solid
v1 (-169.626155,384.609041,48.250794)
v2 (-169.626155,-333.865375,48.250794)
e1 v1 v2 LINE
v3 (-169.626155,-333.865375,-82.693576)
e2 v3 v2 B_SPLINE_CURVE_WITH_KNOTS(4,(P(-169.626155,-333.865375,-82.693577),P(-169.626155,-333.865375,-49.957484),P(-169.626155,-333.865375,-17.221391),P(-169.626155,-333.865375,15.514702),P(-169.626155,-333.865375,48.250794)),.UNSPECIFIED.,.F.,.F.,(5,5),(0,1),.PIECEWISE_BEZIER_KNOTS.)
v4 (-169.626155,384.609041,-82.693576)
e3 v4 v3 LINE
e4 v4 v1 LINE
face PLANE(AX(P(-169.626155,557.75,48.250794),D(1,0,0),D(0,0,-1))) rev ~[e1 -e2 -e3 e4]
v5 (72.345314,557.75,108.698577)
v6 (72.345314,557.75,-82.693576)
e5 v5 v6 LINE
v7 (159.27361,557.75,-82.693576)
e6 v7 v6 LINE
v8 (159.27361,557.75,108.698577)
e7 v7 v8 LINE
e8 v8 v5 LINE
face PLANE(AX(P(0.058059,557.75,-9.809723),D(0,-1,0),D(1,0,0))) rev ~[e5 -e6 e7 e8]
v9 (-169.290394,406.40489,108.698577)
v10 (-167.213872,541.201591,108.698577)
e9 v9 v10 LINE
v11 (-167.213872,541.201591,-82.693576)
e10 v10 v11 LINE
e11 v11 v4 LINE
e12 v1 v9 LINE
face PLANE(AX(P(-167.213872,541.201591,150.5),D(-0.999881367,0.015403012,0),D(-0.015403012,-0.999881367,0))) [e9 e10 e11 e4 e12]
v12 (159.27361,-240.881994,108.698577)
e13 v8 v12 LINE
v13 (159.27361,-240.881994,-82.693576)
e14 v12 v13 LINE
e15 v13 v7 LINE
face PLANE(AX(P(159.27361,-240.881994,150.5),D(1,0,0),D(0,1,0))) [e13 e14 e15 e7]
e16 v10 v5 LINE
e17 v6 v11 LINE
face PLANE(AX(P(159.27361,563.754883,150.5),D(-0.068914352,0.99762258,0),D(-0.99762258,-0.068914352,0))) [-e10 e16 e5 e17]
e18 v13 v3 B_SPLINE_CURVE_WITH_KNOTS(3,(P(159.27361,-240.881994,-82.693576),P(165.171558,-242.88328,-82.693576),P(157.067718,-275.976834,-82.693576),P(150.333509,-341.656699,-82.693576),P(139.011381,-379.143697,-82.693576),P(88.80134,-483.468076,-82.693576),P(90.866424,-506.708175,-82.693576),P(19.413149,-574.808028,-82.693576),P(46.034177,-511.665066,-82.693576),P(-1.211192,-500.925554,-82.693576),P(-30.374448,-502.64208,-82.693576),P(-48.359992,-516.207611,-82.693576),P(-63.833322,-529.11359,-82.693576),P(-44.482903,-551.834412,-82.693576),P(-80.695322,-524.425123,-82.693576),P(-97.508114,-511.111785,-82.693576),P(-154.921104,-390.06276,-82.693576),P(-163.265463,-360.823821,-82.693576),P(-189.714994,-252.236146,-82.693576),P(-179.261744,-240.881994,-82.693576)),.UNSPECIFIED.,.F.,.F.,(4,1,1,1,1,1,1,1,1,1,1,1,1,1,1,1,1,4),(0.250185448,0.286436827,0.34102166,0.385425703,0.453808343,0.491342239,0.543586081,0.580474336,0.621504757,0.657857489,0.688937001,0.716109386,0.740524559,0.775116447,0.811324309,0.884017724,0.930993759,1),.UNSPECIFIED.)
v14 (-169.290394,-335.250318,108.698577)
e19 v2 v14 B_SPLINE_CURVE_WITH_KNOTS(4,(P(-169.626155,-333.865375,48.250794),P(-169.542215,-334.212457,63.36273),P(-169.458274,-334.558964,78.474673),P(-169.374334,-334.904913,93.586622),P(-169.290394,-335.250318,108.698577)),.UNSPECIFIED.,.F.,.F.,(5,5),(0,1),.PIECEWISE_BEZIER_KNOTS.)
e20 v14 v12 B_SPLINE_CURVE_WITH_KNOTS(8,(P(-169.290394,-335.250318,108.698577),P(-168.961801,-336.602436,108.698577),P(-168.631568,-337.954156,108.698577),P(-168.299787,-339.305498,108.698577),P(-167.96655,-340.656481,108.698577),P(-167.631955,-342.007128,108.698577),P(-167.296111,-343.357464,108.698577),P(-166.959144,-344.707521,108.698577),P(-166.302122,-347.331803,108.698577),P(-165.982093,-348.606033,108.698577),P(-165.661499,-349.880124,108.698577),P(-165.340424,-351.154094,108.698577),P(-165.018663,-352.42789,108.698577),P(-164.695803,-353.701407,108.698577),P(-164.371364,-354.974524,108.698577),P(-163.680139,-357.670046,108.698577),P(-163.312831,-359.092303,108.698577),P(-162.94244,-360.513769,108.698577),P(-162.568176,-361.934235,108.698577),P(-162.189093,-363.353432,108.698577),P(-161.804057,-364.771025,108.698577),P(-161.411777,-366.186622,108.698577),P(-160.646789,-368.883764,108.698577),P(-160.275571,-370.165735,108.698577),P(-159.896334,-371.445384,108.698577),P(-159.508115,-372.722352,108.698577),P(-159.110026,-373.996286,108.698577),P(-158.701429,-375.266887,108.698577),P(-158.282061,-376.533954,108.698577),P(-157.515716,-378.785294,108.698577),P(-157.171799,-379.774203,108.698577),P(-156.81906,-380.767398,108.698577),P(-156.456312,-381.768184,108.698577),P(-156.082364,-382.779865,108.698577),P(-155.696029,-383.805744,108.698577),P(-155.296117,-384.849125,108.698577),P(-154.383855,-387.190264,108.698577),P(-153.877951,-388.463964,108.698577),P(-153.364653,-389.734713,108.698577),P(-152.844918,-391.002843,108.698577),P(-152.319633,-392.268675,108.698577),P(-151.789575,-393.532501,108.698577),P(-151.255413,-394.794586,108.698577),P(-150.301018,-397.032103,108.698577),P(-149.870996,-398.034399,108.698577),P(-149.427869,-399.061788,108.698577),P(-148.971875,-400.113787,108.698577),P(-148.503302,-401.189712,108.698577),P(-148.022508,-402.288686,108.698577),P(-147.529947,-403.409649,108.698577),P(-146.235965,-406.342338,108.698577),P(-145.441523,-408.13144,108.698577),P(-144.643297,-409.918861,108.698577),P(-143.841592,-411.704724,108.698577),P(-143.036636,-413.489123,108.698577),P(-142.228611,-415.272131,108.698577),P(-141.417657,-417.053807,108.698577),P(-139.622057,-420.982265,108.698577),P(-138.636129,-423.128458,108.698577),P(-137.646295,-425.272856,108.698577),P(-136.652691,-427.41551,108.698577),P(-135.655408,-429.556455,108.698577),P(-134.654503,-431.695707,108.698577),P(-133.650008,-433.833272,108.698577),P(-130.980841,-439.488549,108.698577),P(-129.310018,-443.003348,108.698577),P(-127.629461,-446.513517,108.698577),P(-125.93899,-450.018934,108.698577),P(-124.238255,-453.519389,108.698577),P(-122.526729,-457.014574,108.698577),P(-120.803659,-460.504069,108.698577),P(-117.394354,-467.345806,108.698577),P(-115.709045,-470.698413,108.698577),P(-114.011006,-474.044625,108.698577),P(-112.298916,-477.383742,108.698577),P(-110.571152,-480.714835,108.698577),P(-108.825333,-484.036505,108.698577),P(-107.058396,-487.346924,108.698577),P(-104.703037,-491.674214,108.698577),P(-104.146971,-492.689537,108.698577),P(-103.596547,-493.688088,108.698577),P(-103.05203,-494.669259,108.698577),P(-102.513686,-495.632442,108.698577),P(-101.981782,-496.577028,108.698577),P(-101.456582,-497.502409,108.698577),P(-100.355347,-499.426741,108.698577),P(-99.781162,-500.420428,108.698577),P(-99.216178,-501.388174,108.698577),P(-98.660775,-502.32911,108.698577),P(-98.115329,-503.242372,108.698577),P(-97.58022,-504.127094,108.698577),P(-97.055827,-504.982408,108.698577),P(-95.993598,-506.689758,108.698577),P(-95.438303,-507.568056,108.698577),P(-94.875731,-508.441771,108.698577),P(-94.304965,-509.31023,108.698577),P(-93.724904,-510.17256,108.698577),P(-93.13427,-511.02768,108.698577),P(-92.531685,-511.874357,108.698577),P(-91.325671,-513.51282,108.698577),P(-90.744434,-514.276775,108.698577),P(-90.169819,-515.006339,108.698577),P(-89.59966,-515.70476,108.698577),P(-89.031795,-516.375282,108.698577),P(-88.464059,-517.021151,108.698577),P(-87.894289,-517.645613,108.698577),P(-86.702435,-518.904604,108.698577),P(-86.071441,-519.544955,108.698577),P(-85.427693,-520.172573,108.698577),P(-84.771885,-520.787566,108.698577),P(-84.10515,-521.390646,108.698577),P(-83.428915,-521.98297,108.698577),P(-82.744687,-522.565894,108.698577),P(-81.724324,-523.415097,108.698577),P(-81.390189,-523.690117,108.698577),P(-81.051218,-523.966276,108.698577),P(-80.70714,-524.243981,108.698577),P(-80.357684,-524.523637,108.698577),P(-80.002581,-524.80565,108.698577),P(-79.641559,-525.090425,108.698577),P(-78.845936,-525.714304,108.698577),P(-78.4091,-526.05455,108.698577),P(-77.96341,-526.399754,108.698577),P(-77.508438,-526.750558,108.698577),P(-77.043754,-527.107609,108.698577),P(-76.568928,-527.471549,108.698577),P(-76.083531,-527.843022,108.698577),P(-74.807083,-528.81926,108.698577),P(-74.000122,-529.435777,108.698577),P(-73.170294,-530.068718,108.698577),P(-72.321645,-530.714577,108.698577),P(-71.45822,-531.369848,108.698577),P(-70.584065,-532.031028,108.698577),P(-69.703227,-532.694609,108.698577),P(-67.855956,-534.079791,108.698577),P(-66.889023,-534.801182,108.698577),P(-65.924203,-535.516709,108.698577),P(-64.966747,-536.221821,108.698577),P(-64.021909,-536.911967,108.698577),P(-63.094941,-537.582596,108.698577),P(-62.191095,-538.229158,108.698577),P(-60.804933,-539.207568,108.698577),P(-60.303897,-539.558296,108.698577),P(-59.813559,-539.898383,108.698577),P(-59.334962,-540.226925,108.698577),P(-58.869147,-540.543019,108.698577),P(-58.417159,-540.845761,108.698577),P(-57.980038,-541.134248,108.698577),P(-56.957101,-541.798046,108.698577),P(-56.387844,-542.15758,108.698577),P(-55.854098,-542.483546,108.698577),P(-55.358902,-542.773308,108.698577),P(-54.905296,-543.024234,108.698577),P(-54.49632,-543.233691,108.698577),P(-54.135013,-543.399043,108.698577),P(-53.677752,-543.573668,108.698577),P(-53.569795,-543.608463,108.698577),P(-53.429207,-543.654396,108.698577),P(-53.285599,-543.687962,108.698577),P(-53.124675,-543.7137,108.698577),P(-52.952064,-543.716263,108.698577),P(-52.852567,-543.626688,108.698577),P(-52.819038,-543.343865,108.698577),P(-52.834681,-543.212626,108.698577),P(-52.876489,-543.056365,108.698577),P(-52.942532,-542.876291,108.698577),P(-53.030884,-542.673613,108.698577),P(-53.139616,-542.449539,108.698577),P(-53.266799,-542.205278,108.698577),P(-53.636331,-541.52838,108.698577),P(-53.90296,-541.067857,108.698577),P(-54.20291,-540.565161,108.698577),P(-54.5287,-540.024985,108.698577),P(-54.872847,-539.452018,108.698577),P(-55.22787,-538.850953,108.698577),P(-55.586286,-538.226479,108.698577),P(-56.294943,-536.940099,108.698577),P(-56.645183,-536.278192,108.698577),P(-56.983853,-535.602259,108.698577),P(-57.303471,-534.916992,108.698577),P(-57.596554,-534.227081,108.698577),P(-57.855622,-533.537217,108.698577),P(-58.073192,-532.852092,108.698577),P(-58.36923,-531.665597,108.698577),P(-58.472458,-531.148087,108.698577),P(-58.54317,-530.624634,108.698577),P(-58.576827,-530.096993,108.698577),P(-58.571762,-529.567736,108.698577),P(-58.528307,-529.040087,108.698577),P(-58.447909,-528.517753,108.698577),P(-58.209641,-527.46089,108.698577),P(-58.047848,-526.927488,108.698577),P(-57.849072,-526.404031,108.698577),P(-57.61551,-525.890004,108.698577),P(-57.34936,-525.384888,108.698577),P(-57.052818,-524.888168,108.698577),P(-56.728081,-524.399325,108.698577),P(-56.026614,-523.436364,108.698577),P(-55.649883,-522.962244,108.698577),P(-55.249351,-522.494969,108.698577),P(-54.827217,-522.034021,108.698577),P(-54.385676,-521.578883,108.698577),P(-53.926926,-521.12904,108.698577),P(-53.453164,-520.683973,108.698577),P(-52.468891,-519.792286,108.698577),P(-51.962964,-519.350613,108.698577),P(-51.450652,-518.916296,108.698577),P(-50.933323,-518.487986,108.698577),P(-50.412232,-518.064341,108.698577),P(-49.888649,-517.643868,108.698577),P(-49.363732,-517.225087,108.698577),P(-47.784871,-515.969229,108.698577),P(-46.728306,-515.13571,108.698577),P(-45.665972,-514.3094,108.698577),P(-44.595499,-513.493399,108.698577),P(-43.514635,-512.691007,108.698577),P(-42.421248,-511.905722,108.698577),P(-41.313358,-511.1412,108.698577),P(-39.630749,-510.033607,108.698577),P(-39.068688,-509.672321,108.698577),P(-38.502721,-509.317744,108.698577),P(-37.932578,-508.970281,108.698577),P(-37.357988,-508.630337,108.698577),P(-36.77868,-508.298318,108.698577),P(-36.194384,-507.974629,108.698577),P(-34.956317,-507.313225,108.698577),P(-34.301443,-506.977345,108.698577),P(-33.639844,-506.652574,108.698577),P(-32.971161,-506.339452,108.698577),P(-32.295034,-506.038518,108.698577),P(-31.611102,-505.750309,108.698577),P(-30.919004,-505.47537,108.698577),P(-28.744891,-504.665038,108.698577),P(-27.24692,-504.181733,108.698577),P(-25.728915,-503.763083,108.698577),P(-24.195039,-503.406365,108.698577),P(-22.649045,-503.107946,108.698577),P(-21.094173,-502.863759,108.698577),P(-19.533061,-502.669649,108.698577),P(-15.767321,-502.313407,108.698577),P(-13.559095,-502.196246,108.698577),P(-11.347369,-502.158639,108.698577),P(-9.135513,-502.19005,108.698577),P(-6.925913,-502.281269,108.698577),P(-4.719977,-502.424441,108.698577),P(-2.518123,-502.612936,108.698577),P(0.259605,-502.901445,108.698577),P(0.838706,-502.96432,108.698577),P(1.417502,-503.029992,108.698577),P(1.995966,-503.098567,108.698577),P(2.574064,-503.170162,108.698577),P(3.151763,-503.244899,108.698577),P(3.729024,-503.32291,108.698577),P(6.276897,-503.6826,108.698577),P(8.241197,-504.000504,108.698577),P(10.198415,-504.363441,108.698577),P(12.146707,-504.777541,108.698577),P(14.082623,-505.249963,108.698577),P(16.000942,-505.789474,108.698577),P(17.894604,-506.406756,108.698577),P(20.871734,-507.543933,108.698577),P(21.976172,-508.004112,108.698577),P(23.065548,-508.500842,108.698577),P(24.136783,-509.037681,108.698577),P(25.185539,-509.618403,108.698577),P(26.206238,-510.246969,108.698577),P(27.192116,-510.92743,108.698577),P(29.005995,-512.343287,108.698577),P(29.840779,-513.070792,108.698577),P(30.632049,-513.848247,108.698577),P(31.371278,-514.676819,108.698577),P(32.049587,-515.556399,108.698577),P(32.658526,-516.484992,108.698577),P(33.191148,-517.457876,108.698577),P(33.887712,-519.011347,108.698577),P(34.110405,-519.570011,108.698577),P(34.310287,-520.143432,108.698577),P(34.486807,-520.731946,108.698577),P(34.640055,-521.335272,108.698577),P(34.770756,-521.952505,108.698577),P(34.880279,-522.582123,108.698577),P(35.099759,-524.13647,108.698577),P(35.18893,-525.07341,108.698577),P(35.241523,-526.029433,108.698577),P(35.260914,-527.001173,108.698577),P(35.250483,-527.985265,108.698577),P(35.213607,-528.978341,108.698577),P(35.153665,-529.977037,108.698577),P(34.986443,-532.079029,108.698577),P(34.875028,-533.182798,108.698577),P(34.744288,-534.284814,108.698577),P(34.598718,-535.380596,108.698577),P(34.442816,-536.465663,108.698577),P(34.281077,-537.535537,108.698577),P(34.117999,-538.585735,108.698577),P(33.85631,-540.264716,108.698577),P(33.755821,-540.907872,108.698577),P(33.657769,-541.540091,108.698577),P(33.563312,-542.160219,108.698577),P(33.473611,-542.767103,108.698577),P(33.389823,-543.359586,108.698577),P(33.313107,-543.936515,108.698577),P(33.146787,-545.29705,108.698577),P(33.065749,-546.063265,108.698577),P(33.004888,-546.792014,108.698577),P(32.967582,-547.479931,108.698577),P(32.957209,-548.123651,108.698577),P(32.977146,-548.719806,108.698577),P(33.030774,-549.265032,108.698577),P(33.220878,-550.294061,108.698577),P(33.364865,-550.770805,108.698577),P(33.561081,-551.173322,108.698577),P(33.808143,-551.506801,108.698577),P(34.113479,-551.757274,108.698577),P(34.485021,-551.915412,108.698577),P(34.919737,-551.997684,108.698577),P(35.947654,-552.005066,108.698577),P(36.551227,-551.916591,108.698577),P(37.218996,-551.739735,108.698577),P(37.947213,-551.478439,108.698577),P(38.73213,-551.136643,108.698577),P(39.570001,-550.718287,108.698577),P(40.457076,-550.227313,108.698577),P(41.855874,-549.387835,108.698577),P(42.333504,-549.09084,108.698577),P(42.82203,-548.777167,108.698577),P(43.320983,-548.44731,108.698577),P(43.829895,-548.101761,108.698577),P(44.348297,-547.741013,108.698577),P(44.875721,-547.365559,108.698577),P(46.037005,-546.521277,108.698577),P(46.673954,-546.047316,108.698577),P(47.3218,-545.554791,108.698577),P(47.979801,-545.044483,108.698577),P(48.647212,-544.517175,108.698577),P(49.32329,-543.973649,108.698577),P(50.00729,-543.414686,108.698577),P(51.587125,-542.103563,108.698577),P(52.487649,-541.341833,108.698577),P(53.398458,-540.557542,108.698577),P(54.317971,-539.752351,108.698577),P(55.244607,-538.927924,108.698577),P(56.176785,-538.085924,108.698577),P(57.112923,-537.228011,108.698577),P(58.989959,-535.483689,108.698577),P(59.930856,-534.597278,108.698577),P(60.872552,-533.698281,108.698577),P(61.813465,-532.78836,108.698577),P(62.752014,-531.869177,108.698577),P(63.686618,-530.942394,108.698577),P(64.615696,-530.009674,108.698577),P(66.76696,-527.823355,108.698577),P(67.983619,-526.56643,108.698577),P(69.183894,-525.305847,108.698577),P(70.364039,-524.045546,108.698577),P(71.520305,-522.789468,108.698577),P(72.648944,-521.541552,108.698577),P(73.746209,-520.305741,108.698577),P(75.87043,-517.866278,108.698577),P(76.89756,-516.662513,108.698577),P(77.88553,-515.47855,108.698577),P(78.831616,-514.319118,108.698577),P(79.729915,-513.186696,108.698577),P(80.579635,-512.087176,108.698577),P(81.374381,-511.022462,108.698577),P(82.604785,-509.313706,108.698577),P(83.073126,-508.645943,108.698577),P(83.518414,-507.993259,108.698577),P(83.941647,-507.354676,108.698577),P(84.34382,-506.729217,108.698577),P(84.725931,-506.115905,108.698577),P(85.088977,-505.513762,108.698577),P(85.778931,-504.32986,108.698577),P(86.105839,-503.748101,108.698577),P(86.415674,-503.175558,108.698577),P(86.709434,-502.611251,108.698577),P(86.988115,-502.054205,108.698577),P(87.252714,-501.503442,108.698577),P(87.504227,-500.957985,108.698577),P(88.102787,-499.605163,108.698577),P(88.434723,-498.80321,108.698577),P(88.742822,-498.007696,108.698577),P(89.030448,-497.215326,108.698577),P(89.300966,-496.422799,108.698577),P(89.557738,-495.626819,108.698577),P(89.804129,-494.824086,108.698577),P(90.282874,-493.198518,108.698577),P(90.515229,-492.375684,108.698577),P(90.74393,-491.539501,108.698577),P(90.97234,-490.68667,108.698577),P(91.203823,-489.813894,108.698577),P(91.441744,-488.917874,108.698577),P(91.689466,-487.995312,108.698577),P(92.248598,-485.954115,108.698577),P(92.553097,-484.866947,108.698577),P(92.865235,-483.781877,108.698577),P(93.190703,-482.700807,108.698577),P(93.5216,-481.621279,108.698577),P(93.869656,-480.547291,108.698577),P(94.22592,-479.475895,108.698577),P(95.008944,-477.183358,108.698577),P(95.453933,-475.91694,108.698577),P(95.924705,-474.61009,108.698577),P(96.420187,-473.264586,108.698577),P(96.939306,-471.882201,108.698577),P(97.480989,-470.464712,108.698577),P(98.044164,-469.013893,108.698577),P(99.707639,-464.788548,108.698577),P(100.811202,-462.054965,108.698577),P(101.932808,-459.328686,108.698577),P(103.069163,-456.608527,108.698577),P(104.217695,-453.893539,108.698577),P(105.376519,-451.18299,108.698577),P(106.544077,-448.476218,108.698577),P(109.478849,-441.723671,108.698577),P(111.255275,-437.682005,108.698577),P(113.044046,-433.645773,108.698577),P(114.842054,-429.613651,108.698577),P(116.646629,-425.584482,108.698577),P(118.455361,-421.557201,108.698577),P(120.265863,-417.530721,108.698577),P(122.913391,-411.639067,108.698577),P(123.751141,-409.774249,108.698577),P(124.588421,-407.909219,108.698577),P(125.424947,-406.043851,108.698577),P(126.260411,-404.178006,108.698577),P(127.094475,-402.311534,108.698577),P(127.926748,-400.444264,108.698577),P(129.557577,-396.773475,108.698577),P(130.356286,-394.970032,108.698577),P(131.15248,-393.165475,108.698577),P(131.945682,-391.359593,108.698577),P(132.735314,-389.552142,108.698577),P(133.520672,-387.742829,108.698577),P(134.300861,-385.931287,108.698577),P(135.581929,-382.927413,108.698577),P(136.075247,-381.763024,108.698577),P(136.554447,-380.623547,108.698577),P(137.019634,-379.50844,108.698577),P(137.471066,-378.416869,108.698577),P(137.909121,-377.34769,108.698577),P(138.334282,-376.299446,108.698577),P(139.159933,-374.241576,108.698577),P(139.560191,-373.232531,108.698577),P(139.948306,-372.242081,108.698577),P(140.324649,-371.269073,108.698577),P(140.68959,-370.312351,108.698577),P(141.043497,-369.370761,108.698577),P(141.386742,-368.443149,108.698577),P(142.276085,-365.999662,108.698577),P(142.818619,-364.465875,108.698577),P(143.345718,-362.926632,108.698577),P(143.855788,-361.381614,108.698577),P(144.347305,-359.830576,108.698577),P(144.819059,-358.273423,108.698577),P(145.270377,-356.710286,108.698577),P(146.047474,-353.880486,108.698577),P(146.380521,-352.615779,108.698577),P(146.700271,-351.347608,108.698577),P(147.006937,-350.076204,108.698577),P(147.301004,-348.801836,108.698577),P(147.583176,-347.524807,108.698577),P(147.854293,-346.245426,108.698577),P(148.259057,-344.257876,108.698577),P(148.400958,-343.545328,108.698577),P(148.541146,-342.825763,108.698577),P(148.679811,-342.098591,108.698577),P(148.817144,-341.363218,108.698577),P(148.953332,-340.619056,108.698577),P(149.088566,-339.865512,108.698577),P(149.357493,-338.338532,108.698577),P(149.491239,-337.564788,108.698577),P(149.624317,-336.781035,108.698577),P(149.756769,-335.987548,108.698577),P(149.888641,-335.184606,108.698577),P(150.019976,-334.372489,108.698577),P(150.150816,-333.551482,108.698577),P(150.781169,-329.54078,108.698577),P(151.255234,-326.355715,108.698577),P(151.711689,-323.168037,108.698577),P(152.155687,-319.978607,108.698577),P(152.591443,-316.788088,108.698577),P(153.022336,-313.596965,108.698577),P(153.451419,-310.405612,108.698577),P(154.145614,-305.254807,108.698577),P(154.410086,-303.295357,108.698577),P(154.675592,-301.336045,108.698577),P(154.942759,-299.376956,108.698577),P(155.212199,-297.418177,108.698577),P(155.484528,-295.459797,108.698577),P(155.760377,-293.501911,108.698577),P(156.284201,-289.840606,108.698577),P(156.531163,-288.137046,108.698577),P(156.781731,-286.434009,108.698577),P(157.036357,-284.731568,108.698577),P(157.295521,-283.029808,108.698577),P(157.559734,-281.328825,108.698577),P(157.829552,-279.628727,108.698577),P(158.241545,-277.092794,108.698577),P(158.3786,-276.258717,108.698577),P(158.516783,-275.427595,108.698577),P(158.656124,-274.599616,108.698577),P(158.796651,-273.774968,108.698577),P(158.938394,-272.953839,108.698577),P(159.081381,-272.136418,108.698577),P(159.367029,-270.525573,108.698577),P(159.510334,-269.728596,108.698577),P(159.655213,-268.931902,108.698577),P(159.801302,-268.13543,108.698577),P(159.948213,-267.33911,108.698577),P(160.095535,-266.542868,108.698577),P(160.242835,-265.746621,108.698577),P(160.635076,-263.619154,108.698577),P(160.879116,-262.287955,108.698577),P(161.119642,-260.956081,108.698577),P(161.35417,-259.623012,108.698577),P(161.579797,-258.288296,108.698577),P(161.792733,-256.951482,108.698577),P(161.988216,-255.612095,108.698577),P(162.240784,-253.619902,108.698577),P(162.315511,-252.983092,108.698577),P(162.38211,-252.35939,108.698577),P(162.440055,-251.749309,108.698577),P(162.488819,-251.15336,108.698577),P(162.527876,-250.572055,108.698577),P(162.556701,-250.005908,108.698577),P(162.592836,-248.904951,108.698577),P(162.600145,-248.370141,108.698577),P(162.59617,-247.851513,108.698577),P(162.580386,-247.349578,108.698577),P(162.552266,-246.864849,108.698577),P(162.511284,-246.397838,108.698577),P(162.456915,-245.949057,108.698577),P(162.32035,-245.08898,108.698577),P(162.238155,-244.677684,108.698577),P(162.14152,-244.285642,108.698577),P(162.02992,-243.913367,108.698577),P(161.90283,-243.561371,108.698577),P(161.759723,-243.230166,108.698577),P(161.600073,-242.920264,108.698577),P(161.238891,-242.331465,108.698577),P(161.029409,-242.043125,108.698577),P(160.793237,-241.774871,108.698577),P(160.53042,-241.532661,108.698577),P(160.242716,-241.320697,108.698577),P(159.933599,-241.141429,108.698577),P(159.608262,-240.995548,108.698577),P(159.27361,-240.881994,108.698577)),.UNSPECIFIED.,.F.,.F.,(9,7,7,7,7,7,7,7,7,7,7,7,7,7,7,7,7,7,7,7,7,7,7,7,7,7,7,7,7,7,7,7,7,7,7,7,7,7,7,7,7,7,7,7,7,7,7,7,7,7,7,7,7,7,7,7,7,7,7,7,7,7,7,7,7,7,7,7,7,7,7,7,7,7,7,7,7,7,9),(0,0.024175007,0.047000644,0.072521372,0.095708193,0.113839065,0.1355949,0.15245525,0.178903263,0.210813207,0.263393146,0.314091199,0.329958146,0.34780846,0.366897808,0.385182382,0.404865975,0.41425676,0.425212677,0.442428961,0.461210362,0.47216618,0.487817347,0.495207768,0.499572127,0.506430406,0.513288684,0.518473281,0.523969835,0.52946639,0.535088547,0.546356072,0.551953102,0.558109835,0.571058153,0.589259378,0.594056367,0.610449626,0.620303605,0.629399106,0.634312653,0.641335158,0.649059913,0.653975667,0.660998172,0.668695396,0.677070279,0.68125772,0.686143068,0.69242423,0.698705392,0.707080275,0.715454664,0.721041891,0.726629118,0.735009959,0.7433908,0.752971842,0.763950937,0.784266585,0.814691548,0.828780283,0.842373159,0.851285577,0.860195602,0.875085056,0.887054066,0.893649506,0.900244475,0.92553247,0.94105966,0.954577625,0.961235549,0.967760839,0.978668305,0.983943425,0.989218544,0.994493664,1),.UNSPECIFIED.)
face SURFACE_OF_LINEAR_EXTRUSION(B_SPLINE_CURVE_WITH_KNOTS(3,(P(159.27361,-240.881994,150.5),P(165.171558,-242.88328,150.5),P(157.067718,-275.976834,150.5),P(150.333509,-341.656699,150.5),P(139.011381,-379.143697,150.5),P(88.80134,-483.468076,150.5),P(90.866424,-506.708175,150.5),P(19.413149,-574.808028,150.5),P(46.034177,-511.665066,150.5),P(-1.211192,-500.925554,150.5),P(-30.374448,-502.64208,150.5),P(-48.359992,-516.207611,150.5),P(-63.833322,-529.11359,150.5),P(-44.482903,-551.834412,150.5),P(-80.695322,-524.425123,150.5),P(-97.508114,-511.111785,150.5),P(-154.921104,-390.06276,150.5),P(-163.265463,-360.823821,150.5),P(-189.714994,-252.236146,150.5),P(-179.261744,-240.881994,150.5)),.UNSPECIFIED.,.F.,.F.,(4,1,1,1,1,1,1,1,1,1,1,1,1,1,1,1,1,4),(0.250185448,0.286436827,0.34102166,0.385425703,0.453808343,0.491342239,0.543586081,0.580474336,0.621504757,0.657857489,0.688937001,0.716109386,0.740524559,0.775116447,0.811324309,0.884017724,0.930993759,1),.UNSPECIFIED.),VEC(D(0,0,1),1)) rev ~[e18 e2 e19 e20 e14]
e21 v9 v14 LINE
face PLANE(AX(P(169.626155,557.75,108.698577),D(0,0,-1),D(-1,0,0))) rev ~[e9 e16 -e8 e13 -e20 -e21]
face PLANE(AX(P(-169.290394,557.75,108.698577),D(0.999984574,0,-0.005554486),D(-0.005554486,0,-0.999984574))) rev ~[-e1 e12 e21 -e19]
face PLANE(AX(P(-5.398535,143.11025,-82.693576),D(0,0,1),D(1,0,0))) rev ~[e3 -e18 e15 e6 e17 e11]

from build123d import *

# Parameters (mm, degrees)
F7_DEPTH  = 1123
F10_DEPTH = 233.1935763359


# Not quite as in the source:
# - the program builds the solid bodies; features that only make, move or delete a surface that nothing else refers to are left out


with BuildPart() as f7:
    # F6 (on offset) → F7 (new body)
    with BuildSketch(Plane.XZ.offset(-557.75)):
        Polygon((169.6261551561, -128.2491087914), (169.6261551561, 48.2507944107), (169.6261551561, 108.6985766888), (-169.2903935909, 108.6985766888), (-169.6261551561, 48.2507944107), (-169.6261551561, -128.2491087914), align=None)
    extrude(amount=F7_DEPTH)

    # F5 (on offset) → F10 (intersect)
    with BuildSketch(Plane.XY.offset(150.5)):
        with BuildLine():
            Line((-167.2138720751, 541.2015914917), (-179.2617440224, -240.8819943666))
            add(Edge.make_bspline(
                [(-179.2617440224, -240.8819943666), (-171.2785629658, -232.210792038), (-117.6374742605, -283.8445292108), (-17.1619143034, -305.5375031921), (70.5901704093, -300.5786903444), (148.8410396828, -237.3420253163), (159.273609519, -240.8819943666)],
                knots=[0, 0, 0, 0, 0.0527002892, 0.1215437511, 0.1860622975, 0.2501854479, 0.2501854479, 0.2501854479, 0.2501854479], degree=3))
            Line((159.273609519, -240.8819943666), (159.273609519, 563.7548832893))
            Line((159.273609519, 563.7548832893), (-167.2138720751, 541.2015914917))
        make_face()
        with BuildLine():
            add(Edge.make_bspline(
                [(-179.2617440224, -240.8819943666), (-171.2785629658, -232.210792038), (-117.6374742605, -283.8445292108), (-17.1619143034, -305.5375031921), (70.5901704093, -300.5786903444), (148.8410396828, -237.3420253163), (159.273609519, -240.8819943666)],
                knots=[0, 0, 0, 0, 0.0527002892, 0.1215437511, 0.1860622975, 0.2501854479, 0.2501854479, 0.2501854479, 0.2501854479], degree=3))
            add(Edge.make_bspline(
                [(159.273609519, -240.8819943666), (165.1715581046, -242.8832803184), (157.0677183853, -275.9768342439), (150.3335094214, -341.6566987697), (139.0113809757, -379.1436971228), (88.8013395888, -483.4680764953), (90.8664236555, -506.7081754017), (19.4131487824, -574.8080281458), (46.0341772666, -511.6650664223), (-1.2111921534, -500.9255535529), (-30.3744478627, -502.6420796901), (-48.3599921391, -516.2076109543), (-63.8333218342, -529.1135904742), (-44.4829025347, -551.8344123744), (-80.6953215397, -524.4251232165), (-97.5081138517, -511.1117853829), (-154.9211039076, -390.0627602909), (-163.2654628367, -360.8238205996), (-189.7149943602, -252.236146055), (-179.2617440224, -240.8819943666)],
                knots=[0.2501854479, 0.2501854479, 0.2501854479, 0.2501854479, 0.2864368271, 0.3410216598, 0.3854257032, 0.4538083426, 0.4913422386, 0.5435860815, 0.5804743356, 0.621504757, 0.6578574893, 0.6889370011, 0.7161093858, 0.7405245589, 0.7751164468, 0.8113243085, 0.8840177236, 0.930993759, 1, 1, 1, 1], degree=3))
        make_face()
    extrude(amount=-F10_DEPTH, mode=Mode.INTERSECT)


solid = f7.part
